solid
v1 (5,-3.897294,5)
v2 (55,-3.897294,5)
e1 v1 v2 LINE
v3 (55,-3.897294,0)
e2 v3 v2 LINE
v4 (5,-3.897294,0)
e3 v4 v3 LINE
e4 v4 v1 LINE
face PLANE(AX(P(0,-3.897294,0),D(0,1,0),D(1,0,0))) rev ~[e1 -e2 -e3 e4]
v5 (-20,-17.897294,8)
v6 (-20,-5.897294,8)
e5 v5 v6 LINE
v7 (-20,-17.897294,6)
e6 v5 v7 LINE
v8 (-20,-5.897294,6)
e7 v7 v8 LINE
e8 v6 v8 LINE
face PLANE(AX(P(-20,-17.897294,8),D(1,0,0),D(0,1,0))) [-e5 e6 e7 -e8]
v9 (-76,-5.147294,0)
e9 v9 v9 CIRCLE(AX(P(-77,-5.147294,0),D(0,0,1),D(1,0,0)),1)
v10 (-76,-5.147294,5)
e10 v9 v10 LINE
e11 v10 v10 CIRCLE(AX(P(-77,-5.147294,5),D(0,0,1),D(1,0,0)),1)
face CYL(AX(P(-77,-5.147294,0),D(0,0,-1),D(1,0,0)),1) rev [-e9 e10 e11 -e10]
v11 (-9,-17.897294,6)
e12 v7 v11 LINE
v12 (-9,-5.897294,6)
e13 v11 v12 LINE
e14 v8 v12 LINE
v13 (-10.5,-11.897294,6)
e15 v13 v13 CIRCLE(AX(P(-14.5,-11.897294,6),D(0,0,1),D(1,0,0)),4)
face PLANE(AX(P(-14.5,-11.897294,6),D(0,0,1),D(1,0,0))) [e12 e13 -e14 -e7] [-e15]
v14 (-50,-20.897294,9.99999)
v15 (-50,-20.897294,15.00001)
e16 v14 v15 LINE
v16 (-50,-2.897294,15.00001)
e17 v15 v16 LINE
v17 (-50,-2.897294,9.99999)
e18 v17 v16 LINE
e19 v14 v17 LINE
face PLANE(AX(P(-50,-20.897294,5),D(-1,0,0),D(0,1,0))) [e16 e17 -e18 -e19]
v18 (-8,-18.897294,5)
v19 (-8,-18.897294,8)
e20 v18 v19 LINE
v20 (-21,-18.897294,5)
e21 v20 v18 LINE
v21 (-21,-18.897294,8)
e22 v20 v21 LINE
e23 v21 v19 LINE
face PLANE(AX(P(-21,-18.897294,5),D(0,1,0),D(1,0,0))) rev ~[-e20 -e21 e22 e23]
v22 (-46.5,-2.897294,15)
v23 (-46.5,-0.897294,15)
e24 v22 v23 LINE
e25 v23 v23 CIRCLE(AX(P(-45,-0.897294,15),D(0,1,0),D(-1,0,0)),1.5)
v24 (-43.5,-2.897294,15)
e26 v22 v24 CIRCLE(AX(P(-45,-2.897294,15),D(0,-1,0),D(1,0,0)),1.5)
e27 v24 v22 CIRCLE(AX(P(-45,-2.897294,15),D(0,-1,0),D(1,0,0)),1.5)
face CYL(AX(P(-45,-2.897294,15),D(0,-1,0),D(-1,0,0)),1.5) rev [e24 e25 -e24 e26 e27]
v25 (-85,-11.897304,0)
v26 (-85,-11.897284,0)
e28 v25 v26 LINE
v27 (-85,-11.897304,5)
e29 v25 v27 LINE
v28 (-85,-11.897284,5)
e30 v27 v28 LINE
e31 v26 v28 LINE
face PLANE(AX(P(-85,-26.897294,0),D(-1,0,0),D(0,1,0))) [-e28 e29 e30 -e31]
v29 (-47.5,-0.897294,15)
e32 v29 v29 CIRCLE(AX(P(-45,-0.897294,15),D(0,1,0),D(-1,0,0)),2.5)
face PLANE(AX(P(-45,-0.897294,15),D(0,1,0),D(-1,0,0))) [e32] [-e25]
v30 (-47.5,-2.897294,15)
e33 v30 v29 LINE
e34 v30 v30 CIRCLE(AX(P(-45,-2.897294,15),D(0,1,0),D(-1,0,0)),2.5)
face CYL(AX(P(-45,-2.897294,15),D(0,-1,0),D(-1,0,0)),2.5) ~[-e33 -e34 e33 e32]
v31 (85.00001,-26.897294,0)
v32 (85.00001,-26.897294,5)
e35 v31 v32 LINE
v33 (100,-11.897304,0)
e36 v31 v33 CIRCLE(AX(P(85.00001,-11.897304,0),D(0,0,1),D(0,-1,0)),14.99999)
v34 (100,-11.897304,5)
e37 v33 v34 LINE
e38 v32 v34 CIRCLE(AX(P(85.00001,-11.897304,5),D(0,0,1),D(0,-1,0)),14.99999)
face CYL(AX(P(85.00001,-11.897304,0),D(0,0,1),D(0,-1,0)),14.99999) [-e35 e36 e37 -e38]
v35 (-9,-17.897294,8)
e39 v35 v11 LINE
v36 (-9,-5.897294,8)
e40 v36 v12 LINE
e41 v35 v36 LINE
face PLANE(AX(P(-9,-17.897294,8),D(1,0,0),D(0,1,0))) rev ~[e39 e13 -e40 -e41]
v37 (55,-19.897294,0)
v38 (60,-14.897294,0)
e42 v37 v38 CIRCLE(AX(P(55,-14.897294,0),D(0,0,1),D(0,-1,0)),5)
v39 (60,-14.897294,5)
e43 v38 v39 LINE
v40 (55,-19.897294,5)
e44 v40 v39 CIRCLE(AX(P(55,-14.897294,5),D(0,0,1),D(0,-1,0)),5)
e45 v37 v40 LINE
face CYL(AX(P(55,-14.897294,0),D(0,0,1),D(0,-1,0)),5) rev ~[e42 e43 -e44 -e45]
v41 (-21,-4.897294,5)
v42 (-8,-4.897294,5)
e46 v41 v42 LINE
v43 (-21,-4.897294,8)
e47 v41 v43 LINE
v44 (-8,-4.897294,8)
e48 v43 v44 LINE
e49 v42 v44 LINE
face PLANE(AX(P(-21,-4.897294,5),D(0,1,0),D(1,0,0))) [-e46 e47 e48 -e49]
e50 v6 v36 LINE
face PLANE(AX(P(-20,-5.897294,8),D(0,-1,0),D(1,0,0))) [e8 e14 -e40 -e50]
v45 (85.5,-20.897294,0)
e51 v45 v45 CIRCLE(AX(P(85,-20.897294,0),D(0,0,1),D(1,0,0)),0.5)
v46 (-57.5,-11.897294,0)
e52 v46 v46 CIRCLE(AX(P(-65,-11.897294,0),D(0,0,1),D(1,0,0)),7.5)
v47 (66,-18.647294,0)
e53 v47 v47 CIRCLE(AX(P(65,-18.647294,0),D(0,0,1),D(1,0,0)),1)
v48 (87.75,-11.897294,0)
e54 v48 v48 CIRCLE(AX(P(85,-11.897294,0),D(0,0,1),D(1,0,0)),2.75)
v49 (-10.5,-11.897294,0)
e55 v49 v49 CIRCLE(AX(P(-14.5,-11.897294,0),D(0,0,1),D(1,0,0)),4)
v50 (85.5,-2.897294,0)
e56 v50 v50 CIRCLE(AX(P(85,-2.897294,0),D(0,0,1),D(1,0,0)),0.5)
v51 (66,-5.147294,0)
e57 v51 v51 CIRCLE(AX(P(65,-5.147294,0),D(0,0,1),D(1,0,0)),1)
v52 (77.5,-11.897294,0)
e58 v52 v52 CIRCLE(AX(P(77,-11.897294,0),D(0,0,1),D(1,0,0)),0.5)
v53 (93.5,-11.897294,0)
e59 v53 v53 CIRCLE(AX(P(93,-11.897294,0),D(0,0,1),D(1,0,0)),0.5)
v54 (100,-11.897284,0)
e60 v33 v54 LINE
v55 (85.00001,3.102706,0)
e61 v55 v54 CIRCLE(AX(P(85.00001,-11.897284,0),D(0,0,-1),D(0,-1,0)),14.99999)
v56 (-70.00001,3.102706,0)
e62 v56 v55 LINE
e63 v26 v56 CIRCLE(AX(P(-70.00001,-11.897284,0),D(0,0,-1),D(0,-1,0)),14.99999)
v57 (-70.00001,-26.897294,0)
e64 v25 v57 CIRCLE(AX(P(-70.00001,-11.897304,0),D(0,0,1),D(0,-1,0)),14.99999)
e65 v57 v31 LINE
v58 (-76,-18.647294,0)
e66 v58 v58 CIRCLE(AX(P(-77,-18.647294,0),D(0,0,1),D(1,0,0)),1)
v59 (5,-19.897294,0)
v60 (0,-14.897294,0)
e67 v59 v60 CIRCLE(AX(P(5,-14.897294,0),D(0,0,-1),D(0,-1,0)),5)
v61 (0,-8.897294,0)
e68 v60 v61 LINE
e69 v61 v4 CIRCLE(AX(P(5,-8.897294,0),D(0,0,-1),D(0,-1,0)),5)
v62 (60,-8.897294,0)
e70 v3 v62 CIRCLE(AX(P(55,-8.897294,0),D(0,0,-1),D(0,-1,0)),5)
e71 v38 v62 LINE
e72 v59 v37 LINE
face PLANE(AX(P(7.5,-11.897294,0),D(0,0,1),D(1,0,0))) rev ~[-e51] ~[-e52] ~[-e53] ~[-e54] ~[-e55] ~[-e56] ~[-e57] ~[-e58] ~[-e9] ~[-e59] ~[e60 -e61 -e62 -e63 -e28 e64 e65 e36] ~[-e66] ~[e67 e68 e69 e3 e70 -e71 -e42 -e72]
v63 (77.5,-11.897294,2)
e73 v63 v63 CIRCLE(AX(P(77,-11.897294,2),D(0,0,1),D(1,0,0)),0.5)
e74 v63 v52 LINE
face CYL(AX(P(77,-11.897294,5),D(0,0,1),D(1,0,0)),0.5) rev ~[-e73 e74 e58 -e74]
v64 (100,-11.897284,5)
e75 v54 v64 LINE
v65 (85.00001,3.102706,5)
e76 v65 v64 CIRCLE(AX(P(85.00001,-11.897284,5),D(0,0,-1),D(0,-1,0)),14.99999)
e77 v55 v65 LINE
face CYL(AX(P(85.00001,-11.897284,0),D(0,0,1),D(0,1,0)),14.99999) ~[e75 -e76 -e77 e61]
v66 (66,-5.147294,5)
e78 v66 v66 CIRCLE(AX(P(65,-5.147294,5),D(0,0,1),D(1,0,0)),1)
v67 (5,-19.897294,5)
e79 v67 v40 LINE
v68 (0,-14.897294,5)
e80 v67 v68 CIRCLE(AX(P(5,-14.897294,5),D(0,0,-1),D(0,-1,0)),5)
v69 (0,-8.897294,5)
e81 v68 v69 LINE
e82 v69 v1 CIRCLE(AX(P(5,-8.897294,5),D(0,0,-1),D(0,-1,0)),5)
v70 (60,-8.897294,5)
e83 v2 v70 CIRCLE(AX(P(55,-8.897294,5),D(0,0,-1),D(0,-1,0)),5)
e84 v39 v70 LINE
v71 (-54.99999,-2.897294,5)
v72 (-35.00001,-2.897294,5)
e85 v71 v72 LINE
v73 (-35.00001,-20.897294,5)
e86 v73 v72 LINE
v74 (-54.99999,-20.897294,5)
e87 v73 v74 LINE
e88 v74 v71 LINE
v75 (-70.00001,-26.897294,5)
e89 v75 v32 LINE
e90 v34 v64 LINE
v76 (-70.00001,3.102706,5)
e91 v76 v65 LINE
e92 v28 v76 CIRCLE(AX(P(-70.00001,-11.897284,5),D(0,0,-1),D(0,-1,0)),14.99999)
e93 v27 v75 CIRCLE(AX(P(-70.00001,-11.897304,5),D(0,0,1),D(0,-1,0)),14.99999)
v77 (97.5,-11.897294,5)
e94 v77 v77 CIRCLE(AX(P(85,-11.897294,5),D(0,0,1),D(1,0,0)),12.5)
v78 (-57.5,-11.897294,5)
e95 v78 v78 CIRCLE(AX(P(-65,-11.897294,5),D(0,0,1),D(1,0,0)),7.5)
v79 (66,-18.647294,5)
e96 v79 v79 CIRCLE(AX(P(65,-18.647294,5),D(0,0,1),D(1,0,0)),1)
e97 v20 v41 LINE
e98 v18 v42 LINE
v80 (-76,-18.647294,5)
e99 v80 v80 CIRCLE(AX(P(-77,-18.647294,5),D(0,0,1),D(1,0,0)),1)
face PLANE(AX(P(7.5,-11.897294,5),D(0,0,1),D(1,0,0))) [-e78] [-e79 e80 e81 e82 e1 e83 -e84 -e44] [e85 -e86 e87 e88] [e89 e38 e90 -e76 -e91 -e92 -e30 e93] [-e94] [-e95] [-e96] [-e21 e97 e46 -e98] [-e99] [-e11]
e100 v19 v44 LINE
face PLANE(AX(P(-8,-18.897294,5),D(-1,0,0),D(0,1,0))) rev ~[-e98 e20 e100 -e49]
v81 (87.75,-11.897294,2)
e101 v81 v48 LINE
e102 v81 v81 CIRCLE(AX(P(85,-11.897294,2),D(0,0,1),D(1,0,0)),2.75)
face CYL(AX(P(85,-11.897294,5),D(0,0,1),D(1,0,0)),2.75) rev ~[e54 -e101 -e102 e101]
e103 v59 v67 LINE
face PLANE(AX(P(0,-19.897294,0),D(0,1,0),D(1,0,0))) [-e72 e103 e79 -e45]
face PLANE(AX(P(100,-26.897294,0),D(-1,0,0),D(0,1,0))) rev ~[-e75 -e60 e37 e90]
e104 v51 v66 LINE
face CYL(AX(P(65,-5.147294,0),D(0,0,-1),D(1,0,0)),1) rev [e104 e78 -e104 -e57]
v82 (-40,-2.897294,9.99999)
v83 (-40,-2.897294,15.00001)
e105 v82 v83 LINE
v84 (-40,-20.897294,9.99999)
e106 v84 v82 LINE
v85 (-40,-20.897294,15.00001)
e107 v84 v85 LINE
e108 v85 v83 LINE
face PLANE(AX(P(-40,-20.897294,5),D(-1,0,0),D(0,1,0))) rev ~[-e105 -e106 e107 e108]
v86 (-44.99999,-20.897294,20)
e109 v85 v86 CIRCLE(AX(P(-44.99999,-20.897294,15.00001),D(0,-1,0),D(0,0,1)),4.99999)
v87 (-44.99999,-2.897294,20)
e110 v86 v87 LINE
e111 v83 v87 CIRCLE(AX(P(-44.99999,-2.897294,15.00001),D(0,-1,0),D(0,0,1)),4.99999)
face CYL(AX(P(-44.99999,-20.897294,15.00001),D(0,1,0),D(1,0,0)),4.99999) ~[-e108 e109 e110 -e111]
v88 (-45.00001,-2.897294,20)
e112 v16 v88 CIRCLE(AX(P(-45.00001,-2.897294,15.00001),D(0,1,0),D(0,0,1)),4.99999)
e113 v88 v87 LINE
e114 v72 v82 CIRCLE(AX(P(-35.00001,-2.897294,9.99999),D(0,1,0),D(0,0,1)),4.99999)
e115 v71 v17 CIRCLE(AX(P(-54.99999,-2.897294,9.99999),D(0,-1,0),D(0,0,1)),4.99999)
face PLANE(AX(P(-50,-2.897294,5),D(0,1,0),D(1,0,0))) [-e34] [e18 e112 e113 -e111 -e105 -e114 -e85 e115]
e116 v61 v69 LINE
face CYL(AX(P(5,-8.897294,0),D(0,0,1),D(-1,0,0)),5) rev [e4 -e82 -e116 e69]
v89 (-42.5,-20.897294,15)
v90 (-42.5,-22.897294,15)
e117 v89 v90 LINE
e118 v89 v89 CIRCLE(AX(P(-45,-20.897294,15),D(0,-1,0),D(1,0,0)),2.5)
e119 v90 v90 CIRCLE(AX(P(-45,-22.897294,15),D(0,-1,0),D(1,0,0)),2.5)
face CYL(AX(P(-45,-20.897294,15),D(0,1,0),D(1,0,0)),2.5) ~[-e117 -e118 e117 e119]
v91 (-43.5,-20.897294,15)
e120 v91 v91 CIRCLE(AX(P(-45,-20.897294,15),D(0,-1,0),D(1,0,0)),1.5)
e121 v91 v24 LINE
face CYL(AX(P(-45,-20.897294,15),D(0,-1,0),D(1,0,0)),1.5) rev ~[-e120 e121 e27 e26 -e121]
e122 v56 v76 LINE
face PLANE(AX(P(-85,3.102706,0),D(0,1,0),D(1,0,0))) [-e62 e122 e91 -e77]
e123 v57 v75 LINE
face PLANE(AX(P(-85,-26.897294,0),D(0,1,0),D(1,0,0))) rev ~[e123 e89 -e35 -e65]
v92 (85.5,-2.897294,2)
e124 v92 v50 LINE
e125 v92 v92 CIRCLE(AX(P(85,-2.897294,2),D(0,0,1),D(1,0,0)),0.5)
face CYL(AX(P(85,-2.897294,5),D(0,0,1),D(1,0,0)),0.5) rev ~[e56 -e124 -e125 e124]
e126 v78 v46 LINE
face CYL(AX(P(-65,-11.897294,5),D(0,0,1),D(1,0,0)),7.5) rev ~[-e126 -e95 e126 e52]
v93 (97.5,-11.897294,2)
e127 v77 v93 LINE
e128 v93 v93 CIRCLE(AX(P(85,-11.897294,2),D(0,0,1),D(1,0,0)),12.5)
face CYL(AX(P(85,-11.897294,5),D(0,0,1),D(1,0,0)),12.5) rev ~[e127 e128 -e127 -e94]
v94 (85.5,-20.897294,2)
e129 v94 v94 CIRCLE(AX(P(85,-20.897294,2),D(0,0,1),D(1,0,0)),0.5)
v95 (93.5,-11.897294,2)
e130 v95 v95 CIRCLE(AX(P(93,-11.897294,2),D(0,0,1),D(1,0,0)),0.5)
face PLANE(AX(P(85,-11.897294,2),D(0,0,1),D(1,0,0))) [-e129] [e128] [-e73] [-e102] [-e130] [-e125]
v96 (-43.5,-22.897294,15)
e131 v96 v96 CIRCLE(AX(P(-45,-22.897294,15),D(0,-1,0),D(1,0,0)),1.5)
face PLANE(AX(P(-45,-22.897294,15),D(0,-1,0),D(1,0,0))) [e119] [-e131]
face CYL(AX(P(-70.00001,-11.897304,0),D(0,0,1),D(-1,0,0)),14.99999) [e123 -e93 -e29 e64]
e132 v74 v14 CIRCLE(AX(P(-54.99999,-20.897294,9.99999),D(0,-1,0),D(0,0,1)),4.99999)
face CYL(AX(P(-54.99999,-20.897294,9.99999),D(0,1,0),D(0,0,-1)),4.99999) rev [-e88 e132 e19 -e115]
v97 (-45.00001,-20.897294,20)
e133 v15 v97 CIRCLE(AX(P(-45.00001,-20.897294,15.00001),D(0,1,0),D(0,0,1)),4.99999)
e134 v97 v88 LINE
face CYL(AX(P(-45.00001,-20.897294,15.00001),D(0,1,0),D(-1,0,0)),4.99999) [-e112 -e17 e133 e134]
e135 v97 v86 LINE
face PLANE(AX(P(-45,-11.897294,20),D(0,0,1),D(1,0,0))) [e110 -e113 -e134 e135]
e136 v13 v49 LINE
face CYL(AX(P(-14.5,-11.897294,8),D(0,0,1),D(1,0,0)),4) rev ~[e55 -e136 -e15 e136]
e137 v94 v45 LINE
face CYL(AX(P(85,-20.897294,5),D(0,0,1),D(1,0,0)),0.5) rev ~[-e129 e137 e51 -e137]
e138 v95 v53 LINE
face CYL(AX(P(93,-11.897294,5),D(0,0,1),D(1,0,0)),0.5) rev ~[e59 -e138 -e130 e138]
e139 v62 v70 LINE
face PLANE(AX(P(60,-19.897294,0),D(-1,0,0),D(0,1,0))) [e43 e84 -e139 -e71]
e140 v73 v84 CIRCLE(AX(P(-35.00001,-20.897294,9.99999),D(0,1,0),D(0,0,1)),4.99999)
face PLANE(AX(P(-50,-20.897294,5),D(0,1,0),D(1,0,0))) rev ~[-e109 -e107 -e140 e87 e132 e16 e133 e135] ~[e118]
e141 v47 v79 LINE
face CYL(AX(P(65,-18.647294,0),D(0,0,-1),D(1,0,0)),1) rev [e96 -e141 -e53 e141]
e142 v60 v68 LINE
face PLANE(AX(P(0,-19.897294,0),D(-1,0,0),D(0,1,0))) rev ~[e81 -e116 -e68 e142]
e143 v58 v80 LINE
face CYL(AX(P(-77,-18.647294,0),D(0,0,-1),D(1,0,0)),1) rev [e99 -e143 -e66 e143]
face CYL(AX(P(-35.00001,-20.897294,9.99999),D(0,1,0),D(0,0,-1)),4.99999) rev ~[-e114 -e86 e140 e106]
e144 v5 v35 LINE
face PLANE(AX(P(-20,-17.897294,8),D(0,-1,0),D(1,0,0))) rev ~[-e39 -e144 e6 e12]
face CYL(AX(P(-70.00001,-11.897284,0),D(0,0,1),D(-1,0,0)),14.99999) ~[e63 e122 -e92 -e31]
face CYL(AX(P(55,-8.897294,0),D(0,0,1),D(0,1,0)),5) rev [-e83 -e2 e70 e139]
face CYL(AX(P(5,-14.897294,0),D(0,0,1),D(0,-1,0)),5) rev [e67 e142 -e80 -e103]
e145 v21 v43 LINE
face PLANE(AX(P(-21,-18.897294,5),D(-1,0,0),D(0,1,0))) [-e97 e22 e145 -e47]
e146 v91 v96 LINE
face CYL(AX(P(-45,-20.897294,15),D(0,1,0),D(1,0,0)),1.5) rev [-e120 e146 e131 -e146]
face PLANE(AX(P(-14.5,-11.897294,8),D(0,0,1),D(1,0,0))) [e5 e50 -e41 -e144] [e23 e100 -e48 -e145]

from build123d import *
from build123d import SkipClean  # not in build123d's __all__

# Parameters (mm, degrees)
F0_W      = 185
F0_H      = 30
F0_R      = 1
F0_W_2    = 60
F0_H_2    = 16
F1_DEPTH  = 5
F2_R      = 12.5
F2_R_2    = 0.5
F2_R_3    = 2.75
F3_DEPTH  = 3
F4_DEPTH  = 25
F5_R      = 14.99999
F2_R_4    = 7.5
F6_DEPTH  = 25
F2_W      = 10
F2_H      = 18
F7_DEPTH  = 15
F8_R      = 4.99999
F9_R      = 1.5
F10_DEPTH = 25
F9_R_2    = 2.5
F11_DEPTH = 2
F12_R     = 2.5
F12_R_2   = 1.5
F13_DEPTH = 2
F2_W_2    = 13
F2_H_2    = 14
F14_DEPTH = 3
F15_W     = 11
F15_H     = 12
F15_R     = 4
F16_DEPTH = 2
F17_DEPTH = 25
F18_R     = 5


# Not quite as in the source:
# - a fillet or chamfer is up to 0.001 mm smaller than in the source, because OpenCascade refuses the exact size
# - after a boolean that leaves OpenCascade's solid faulty, fix() repairs it


with BuildPart() as f1:
    # F0 (on Top) → F1 (new body)
    with BuildSketch(Plane.XY):
        with Locations((7.5, -11.8972941886)):
            Rectangle(F0_W, F0_H)
        with Locations((-77, -18.6472941886)):
            Circle(F0_R, mode=Mode.SUBTRACT)
        with Locations((30, -11.8972941886)):
            Rectangle(F0_W_2, F0_H_2, mode=Mode.SUBTRACT)
        with Locations((65, -18.6472941886)):
            Circle(F0_R, mode=Mode.SUBTRACT)
        with Locations((-77, -5.1472941886)):
            Circle(F0_R, mode=Mode.SUBTRACT)
        with Locations((65, -5.1472941886)):
            Circle(F0_R, mode=Mode.SUBTRACT)
    extrude(amount=F1_DEPTH)

    # F2 (on face) → F3 (cut)
    with BuildSketch(Plane.XY.offset(5)):
        with Locations((85, -11.8972941886)):
            Circle(F2_R)
        with Locations((85, -20.8972941886)):
            Circle(F2_R_2, mode=Mode.SUBTRACT)
        with Locations((85, -11.8972941886)):
            Circle(F2_R_3, mode=Mode.SUBTRACT)
        with Locations((77, -11.8972941886)):
            Circle(F2_R_2, mode=Mode.SUBTRACT)
        with Locations((93, -11.8972941886)):
            Circle(F2_R_2, mode=Mode.SUBTRACT)
        with Locations((85, -2.8972941886)):
            Circle(F2_R_2, mode=Mode.SUBTRACT)
    extrude(amount=-F3_DEPTH, mode=Mode.SUBTRACT)

    # F2 (on face) → F4 (cut)
    with BuildSketch(Plane.XY.offset(5)):
        with Locations((85, -11.8972941886)):
            Circle(F2_R_3)
        with Locations((85, -2.8972941886)):
            Circle(F2_R_2)
        with Locations((77, -11.8972941886)):
            Circle(F2_R_2)
        with Locations((85, -20.8972941886)):
            Circle(F2_R_2)
        with Locations((93, -11.8972941886)):
            Circle(F2_R_2)
    extrude(amount=-F4_DEPTH, mode=Mode.SUBTRACT)

    # F5 (radius 15 in the source; OpenCascade refuses exactly that, so slightly less here)
    f5_edges = [f1.edges().sort_by_distance(p)[0] for p in [
        (100, 3.102706, 2.5),
        (100, -26.897294, 2.5),
        (-85, -26.897294, 2.5),
        (-85, 3.102706, 2.5),
    ]]
    fillet(f5_edges, radius=F5_R)

    # F2 (on face) → F6 (cut)
    with BuildSketch(Plane.XY.offset(5)):
        with Locations((-65, -11.8972941886)):
            Circle(F2_R_4)
    extrude(amount=-F6_DEPTH, mode=Mode.SUBTRACT)

    # F2 (on face) → F7 (join)
    with BuildSketch(Plane.XY.offset(5)):
        with Locations((-45, -11.8972941886)):
            Rectangle(F2_W, F2_H)
    extrude(amount=F7_DEPTH)

    # F8 (radius 5 in the source; OpenCascade refuses exactly that, so slightly less here)
    f8_edges = [f1.edges().sort_by_distance(p)[0] for p in [
        (-50, -11.897294, 5),
        (-40, -11.897294, 20),
        (-50, -11.897294, 20),
        (-40, -11.897294, 5),
    ]]
    fillet(f8_edges, radius=F8_R)

    # F9 (on face) → F10 (cut)
    with BuildSketch(Plane.XZ.offset(20.8972941886)):
        with Locations((-45, 15)):
            Circle(F9_R)
    extrude(amount=-F10_DEPTH, mode=Mode.SUBTRACT)

    # F9 (on face) → F11 (join)
    with BuildSketch(Plane.XZ.offset(20.8972941886)):
        with Locations((-45, 15)):
            Circle(F9_R_2)
        with Locations((-45, 15)):
            Circle(F9_R, mode=Mode.SUBTRACT)
    extrude(amount=F11_DEPTH)

    # F12 (on face) → F13 (join)
    with BuildSketch(Plane(origin=(0, -2.8972941886, 0), x_dir=(-1, 0, 0), z_dir=(0, 1, 0))):
        with Locations((45, 15)):
            Circle(F12_R)
        with Locations((45, 15)):
            Circle(F12_R_2, mode=Mode.SUBTRACT)
    with SkipClean():  # cleaning this boolean's faces spoils the solid; the shape is the same uncleaned
        extrude(amount=F13_DEPTH)

    # F2 (on face) → F14 (join)
    with BuildSketch(Plane.XY.offset(5)):
        with Locations((-14.5, -11.8972941886)):
            Rectangle(F2_W_2, F2_H_2)
    extrude(amount=F14_DEPTH)

    add(f1.part.fix(), mode=Mode.REPLACE)

    # F15 (on face) → F16 (cut)
    with BuildSketch(Plane.XY.offset(8)):
        with Locations((-14.5, -11.8972941886)):
            Rectangle(F15_W, F15_H)
        with Locations((-14.5, -11.8972941886)):
            Circle(F15_R, mode=Mode.SUBTRACT)
    extrude(amount=-F16_DEPTH, mode=Mode.SUBTRACT)

    # F17 (cut): a face of the model
    f17_faces = [f1.faces().sort_by_distance(p)[0] for p in [
        (-14.5, -11.8972941886, 8),
    ]]
    extrude(f17_faces, amount=-F17_DEPTH, mode=Mode.SUBTRACT)

    # F18
    f18_edges = [f1.edges().sort_by_distance(p)[0] for p in [
        (0, -3.897294, 2.5),
        (0, -19.897294, 2.5),
        (60, -3.897294, 2.5),
        (60, -19.897294, 2.5),
    ]]
    fillet(f18_edges, radius=F18_R)


solid = f1.part
